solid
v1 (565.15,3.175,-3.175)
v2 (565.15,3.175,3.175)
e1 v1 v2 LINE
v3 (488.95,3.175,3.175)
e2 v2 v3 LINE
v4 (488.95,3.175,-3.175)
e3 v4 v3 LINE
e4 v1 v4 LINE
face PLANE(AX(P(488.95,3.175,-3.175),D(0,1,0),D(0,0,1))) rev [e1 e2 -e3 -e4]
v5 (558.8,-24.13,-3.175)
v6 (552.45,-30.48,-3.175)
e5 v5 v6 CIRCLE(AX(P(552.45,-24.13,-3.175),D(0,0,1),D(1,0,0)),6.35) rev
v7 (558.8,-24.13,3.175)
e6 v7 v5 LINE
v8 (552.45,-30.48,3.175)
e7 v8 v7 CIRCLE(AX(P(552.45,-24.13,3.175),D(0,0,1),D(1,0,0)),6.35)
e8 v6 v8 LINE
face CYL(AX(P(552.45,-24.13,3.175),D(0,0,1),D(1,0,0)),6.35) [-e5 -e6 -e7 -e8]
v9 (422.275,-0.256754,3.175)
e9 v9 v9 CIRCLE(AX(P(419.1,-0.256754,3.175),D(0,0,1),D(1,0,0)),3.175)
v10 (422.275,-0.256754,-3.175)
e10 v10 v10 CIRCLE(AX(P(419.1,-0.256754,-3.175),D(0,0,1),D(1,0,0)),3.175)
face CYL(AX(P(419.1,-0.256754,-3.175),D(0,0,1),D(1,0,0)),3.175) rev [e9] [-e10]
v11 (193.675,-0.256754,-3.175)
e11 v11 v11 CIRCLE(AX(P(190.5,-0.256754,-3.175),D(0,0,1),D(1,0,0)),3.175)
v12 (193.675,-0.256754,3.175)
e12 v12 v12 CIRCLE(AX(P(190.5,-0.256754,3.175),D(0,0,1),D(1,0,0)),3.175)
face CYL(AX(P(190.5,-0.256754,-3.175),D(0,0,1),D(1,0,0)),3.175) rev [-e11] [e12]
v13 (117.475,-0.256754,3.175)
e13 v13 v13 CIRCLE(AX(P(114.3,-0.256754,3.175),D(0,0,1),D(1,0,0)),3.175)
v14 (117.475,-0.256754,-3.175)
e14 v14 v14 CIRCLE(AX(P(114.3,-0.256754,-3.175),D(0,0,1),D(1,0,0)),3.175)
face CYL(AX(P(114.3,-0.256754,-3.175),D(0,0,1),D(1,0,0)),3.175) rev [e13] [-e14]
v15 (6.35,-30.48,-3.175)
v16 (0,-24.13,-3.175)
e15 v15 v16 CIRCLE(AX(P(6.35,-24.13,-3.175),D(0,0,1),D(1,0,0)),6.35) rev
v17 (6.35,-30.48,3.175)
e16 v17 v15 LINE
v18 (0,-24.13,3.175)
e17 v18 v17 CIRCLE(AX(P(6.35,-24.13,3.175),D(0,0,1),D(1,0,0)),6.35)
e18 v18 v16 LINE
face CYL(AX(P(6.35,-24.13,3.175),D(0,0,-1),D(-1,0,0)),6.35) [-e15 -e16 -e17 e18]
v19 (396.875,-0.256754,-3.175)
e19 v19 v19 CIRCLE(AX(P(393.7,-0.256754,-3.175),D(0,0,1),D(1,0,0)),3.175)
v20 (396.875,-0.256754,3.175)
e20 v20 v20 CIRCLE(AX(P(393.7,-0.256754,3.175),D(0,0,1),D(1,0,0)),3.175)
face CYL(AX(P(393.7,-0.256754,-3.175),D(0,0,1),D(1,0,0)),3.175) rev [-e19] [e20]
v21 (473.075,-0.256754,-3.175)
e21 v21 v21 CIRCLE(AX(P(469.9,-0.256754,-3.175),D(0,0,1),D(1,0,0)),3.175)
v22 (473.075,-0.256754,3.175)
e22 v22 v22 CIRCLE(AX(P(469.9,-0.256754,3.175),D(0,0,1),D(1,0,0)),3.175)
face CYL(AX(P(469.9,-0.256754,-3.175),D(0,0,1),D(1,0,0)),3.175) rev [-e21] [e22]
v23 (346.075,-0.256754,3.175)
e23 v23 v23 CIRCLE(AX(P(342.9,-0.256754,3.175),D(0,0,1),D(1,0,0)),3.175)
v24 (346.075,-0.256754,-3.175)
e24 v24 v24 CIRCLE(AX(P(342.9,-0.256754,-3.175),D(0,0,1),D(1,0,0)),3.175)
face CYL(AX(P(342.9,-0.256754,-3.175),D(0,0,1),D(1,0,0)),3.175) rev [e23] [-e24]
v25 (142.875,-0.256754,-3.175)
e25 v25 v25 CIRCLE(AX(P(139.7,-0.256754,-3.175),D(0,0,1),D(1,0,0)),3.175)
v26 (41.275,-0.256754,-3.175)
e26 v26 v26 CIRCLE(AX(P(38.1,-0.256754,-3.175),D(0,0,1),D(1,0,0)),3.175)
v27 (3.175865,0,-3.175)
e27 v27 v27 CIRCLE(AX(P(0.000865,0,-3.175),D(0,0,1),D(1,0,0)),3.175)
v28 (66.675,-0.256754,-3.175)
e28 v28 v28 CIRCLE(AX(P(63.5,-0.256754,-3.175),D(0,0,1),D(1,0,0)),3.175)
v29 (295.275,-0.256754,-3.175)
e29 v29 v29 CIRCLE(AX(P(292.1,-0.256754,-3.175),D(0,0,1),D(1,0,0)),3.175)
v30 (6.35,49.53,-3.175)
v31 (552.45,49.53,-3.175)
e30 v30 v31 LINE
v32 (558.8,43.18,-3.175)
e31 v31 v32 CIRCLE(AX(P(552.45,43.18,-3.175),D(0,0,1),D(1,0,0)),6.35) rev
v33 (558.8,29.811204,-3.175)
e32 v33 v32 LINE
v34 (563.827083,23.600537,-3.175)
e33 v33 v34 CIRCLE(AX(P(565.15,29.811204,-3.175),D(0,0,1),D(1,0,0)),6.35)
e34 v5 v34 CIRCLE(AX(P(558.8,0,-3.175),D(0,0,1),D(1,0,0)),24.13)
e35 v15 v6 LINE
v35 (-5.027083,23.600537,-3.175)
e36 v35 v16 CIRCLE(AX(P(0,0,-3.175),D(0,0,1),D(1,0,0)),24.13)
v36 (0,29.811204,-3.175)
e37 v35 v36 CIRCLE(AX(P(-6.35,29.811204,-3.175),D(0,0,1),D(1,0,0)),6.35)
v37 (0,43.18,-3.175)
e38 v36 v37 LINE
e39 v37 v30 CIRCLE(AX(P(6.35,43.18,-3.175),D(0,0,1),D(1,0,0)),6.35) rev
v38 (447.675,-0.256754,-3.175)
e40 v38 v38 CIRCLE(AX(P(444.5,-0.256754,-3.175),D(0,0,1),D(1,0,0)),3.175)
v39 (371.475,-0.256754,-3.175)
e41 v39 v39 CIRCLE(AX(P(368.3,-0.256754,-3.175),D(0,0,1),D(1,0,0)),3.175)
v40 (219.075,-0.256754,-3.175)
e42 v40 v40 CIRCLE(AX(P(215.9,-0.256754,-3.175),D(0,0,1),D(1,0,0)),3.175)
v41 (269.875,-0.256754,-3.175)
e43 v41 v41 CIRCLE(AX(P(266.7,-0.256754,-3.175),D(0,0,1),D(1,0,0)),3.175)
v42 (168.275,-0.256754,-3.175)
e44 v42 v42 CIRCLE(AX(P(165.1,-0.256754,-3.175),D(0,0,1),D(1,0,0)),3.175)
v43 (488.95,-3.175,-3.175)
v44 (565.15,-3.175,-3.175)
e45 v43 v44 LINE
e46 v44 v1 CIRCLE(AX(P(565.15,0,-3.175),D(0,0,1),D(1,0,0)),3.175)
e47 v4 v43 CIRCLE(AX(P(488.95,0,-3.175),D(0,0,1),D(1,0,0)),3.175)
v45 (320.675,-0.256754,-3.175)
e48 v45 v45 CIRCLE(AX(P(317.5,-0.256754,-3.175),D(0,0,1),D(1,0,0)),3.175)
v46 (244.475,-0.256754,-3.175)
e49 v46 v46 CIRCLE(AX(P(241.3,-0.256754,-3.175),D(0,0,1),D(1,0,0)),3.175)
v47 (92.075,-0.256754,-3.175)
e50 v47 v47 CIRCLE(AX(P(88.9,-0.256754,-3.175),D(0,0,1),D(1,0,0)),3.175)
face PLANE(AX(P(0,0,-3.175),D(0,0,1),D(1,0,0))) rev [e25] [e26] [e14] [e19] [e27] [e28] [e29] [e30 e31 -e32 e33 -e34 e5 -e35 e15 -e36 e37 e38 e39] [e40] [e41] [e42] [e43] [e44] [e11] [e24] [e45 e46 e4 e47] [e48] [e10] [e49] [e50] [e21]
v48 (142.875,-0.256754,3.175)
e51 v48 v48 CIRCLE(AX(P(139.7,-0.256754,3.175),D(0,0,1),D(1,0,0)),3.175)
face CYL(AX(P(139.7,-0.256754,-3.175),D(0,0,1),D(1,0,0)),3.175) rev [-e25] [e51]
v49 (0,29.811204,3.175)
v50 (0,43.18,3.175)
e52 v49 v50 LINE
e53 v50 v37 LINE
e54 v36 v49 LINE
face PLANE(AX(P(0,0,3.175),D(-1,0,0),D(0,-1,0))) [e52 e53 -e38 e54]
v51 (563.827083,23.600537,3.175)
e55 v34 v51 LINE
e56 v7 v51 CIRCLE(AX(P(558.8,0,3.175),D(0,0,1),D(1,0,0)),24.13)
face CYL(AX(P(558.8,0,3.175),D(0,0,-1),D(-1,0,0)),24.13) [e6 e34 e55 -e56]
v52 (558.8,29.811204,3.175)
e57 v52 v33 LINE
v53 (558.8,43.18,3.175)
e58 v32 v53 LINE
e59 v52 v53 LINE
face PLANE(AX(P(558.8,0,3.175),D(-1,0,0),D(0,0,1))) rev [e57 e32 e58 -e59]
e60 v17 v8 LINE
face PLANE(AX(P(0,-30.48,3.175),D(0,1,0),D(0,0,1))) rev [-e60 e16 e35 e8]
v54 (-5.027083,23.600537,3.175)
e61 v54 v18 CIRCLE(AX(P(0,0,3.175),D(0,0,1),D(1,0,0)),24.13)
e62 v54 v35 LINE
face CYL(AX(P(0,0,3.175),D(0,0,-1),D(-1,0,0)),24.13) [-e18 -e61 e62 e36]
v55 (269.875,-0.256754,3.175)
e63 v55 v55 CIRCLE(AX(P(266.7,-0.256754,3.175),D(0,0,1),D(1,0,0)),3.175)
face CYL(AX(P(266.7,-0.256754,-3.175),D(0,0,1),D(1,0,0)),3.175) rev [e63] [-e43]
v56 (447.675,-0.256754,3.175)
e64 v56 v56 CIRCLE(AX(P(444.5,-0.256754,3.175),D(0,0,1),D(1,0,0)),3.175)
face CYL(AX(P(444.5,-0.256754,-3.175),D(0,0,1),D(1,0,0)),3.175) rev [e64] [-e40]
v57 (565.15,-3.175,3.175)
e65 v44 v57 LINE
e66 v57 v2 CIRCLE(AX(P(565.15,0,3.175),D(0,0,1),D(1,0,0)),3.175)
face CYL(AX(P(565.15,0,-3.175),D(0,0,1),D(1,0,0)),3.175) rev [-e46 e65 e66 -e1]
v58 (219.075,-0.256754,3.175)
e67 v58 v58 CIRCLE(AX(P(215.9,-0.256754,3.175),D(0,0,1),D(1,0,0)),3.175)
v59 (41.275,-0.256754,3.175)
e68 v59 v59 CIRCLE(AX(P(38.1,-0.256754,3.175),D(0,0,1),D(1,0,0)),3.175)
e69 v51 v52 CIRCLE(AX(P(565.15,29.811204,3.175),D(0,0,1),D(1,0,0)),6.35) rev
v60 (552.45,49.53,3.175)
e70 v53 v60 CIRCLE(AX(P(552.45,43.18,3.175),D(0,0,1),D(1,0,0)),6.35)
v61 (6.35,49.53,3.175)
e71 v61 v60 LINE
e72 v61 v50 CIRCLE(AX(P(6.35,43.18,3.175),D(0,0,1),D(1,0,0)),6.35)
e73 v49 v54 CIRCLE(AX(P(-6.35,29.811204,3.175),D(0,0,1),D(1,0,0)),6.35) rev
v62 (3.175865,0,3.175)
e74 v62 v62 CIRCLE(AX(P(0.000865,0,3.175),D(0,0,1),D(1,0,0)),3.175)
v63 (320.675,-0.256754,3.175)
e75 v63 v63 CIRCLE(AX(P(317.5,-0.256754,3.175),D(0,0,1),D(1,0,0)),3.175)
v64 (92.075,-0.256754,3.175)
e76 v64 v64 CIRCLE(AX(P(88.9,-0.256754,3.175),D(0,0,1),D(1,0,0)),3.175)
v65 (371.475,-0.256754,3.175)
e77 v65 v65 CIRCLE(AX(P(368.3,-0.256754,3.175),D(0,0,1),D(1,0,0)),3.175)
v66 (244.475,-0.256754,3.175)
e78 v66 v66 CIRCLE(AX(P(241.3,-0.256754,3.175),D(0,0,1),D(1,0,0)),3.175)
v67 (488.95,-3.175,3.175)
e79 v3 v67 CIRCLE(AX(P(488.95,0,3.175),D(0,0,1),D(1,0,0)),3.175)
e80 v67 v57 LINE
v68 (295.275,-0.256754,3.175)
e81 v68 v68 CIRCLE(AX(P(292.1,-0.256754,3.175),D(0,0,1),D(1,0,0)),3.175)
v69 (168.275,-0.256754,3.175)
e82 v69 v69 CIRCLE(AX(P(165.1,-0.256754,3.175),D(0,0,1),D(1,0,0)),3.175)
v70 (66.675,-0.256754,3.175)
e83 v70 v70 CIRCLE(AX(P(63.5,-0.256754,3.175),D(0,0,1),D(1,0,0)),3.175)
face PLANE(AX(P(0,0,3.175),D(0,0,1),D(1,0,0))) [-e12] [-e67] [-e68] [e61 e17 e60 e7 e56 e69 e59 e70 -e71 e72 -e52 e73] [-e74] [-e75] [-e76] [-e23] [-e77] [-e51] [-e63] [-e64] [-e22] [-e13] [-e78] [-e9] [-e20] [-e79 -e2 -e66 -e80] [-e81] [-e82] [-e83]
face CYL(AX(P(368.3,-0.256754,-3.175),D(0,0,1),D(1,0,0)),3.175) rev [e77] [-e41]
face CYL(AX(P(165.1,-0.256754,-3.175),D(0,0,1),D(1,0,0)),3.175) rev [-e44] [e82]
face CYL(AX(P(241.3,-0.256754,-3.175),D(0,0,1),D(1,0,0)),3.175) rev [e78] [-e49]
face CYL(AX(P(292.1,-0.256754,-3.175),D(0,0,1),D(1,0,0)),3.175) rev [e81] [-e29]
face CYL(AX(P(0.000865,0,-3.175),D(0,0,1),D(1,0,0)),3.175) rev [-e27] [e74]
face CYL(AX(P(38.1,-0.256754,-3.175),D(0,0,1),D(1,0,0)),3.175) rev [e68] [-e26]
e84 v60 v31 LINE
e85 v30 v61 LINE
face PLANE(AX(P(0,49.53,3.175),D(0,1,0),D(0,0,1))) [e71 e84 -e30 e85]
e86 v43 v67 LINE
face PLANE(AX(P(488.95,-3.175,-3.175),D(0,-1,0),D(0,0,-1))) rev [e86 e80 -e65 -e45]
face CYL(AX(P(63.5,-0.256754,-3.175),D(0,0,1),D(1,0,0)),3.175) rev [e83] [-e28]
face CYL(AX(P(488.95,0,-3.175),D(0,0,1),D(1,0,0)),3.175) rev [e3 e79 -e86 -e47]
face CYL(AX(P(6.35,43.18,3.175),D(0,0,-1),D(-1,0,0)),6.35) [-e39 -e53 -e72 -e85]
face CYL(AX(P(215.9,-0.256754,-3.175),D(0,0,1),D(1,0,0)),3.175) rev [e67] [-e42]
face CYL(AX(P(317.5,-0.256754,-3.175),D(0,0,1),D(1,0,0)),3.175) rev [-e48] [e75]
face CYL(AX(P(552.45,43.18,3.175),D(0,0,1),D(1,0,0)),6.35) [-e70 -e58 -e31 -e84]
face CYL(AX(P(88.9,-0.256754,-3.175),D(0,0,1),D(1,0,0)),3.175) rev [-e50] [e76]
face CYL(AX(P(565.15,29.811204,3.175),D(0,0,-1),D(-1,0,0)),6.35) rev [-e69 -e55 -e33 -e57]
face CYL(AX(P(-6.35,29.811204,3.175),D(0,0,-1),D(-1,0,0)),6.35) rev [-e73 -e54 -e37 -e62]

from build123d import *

# Parameters (mm, degrees)
SKETCH1_W           = 558.8
SKETCH1_H           = 25.4
SKETCH1_H_2         = 6.35
BOSS_EXTRUDE1_DEPTH = 3.175
SKETCH2_R           = 3.175
CUT_EXTRUDE1_DEPTH  = 586.064892384
FILLET1_R           = 6.35


with BuildPart() as part:
    # Sketch1 → Boss-Extrude1 (new, symmetric)
    with BuildSketch(Plane.XY):
        with Locations((279.4, 36.83)):
            Rectangle(SKETCH1_W, SKETCH1_H)
        with BuildLine():
            Line((0, -24.13), (558.8, -24.13))
            ThreePointArc((558.8, -24.13), (582.93, 0), (558.8, 24.13))
            Line((558.8, 24.13), (0, 24.13))
            ThreePointArc((0, 24.13), (-24.13, 0), (0, -24.13))
        make_face()
        with Locations((279.4, -27.305)):
            Rectangle(SKETCH1_W, SKETCH1_H_2)
    extrude(amount=BOSS_EXTRUDE1_DEPTH, both=True)

    # Sketch2 → Cut-Extrude1 (cut, through all)
    with BuildSketch(Plane.XY.offset(3.175)):
        with Locations((0.000865133, 0)):
            Circle(SKETCH2_R)
        with Locations((38.1, -0.256753551)):
            Circle(SKETCH2_R)
        with Locations((63.5, -0.256753551)):
            Circle(SKETCH2_R)
        with Locations((88.9, -0.256753551)):
            Circle(SKETCH2_R)
        with Locations((114.3, -0.256753551)):
            Circle(SKETCH2_R)
        with Locations((139.7, -0.256753551)):
            Circle(SKETCH2_R)
        with Locations((165.1, -0.256753551)):
            Circle(SKETCH2_R)
        with Locations((190.5, -0.256753551)):
            Circle(SKETCH2_R)
        with Locations((215.9, -0.256753551)):
            Circle(SKETCH2_R)
        with Locations((241.3, -0.256753551)):
            Circle(SKETCH2_R)
        with Locations((266.7, -0.256753551)):
            Circle(SKETCH2_R)
        with Locations((292.1, -0.256753551)):
            Circle(SKETCH2_R)
        with Locations((317.5, -0.256753551)):
            Circle(SKETCH2_R)
        with Locations((342.9, -0.256753551)):
            Circle(SKETCH2_R)
        with Locations((368.3, -0.256753551)):
            Circle(SKETCH2_R)
        with Locations((393.7, -0.256753551)):
            Circle(SKETCH2_R)
        with Locations((419.1, -0.256753551)):
            Circle(SKETCH2_R)
        with Locations((444.5, -0.256753551)):
            Circle(SKETCH2_R)
        with Locations((469.9, -0.256753551)):
            Circle(SKETCH2_R)
        with BuildLine():
            Line((488.95, 3.175), (565.15, 3.175))
            ThreePointArc((565.15, 3.175), (568.325, 0), (565.15, -3.175))
            Line((565.15, -3.175), (488.95, -3.175))
            ThreePointArc((488.95, -3.175), (485.775, 0), (488.95, 3.175))
        make_face()
    extrude(amount=-CUT_EXTRUDE1_DEPTH, mode=Mode.SUBTRACT)

    # Fillet1
    fillet1_edges = [part.edges().sort_by_distance(p)[0] for p in [
        (558.8, 49.53, 0),
        (558.8, 24.13, 0),
        (0, 24.13, 0),
        (0, 49.53, 0),
        (0, -30.48, 0),
        (558.8, -30.48, 0),
    ]]
    fillet(fillet1_edges, radius=FILLET1_R - 0.0001)  # a hair under: the kernel refuses the full size


solid = part.part
